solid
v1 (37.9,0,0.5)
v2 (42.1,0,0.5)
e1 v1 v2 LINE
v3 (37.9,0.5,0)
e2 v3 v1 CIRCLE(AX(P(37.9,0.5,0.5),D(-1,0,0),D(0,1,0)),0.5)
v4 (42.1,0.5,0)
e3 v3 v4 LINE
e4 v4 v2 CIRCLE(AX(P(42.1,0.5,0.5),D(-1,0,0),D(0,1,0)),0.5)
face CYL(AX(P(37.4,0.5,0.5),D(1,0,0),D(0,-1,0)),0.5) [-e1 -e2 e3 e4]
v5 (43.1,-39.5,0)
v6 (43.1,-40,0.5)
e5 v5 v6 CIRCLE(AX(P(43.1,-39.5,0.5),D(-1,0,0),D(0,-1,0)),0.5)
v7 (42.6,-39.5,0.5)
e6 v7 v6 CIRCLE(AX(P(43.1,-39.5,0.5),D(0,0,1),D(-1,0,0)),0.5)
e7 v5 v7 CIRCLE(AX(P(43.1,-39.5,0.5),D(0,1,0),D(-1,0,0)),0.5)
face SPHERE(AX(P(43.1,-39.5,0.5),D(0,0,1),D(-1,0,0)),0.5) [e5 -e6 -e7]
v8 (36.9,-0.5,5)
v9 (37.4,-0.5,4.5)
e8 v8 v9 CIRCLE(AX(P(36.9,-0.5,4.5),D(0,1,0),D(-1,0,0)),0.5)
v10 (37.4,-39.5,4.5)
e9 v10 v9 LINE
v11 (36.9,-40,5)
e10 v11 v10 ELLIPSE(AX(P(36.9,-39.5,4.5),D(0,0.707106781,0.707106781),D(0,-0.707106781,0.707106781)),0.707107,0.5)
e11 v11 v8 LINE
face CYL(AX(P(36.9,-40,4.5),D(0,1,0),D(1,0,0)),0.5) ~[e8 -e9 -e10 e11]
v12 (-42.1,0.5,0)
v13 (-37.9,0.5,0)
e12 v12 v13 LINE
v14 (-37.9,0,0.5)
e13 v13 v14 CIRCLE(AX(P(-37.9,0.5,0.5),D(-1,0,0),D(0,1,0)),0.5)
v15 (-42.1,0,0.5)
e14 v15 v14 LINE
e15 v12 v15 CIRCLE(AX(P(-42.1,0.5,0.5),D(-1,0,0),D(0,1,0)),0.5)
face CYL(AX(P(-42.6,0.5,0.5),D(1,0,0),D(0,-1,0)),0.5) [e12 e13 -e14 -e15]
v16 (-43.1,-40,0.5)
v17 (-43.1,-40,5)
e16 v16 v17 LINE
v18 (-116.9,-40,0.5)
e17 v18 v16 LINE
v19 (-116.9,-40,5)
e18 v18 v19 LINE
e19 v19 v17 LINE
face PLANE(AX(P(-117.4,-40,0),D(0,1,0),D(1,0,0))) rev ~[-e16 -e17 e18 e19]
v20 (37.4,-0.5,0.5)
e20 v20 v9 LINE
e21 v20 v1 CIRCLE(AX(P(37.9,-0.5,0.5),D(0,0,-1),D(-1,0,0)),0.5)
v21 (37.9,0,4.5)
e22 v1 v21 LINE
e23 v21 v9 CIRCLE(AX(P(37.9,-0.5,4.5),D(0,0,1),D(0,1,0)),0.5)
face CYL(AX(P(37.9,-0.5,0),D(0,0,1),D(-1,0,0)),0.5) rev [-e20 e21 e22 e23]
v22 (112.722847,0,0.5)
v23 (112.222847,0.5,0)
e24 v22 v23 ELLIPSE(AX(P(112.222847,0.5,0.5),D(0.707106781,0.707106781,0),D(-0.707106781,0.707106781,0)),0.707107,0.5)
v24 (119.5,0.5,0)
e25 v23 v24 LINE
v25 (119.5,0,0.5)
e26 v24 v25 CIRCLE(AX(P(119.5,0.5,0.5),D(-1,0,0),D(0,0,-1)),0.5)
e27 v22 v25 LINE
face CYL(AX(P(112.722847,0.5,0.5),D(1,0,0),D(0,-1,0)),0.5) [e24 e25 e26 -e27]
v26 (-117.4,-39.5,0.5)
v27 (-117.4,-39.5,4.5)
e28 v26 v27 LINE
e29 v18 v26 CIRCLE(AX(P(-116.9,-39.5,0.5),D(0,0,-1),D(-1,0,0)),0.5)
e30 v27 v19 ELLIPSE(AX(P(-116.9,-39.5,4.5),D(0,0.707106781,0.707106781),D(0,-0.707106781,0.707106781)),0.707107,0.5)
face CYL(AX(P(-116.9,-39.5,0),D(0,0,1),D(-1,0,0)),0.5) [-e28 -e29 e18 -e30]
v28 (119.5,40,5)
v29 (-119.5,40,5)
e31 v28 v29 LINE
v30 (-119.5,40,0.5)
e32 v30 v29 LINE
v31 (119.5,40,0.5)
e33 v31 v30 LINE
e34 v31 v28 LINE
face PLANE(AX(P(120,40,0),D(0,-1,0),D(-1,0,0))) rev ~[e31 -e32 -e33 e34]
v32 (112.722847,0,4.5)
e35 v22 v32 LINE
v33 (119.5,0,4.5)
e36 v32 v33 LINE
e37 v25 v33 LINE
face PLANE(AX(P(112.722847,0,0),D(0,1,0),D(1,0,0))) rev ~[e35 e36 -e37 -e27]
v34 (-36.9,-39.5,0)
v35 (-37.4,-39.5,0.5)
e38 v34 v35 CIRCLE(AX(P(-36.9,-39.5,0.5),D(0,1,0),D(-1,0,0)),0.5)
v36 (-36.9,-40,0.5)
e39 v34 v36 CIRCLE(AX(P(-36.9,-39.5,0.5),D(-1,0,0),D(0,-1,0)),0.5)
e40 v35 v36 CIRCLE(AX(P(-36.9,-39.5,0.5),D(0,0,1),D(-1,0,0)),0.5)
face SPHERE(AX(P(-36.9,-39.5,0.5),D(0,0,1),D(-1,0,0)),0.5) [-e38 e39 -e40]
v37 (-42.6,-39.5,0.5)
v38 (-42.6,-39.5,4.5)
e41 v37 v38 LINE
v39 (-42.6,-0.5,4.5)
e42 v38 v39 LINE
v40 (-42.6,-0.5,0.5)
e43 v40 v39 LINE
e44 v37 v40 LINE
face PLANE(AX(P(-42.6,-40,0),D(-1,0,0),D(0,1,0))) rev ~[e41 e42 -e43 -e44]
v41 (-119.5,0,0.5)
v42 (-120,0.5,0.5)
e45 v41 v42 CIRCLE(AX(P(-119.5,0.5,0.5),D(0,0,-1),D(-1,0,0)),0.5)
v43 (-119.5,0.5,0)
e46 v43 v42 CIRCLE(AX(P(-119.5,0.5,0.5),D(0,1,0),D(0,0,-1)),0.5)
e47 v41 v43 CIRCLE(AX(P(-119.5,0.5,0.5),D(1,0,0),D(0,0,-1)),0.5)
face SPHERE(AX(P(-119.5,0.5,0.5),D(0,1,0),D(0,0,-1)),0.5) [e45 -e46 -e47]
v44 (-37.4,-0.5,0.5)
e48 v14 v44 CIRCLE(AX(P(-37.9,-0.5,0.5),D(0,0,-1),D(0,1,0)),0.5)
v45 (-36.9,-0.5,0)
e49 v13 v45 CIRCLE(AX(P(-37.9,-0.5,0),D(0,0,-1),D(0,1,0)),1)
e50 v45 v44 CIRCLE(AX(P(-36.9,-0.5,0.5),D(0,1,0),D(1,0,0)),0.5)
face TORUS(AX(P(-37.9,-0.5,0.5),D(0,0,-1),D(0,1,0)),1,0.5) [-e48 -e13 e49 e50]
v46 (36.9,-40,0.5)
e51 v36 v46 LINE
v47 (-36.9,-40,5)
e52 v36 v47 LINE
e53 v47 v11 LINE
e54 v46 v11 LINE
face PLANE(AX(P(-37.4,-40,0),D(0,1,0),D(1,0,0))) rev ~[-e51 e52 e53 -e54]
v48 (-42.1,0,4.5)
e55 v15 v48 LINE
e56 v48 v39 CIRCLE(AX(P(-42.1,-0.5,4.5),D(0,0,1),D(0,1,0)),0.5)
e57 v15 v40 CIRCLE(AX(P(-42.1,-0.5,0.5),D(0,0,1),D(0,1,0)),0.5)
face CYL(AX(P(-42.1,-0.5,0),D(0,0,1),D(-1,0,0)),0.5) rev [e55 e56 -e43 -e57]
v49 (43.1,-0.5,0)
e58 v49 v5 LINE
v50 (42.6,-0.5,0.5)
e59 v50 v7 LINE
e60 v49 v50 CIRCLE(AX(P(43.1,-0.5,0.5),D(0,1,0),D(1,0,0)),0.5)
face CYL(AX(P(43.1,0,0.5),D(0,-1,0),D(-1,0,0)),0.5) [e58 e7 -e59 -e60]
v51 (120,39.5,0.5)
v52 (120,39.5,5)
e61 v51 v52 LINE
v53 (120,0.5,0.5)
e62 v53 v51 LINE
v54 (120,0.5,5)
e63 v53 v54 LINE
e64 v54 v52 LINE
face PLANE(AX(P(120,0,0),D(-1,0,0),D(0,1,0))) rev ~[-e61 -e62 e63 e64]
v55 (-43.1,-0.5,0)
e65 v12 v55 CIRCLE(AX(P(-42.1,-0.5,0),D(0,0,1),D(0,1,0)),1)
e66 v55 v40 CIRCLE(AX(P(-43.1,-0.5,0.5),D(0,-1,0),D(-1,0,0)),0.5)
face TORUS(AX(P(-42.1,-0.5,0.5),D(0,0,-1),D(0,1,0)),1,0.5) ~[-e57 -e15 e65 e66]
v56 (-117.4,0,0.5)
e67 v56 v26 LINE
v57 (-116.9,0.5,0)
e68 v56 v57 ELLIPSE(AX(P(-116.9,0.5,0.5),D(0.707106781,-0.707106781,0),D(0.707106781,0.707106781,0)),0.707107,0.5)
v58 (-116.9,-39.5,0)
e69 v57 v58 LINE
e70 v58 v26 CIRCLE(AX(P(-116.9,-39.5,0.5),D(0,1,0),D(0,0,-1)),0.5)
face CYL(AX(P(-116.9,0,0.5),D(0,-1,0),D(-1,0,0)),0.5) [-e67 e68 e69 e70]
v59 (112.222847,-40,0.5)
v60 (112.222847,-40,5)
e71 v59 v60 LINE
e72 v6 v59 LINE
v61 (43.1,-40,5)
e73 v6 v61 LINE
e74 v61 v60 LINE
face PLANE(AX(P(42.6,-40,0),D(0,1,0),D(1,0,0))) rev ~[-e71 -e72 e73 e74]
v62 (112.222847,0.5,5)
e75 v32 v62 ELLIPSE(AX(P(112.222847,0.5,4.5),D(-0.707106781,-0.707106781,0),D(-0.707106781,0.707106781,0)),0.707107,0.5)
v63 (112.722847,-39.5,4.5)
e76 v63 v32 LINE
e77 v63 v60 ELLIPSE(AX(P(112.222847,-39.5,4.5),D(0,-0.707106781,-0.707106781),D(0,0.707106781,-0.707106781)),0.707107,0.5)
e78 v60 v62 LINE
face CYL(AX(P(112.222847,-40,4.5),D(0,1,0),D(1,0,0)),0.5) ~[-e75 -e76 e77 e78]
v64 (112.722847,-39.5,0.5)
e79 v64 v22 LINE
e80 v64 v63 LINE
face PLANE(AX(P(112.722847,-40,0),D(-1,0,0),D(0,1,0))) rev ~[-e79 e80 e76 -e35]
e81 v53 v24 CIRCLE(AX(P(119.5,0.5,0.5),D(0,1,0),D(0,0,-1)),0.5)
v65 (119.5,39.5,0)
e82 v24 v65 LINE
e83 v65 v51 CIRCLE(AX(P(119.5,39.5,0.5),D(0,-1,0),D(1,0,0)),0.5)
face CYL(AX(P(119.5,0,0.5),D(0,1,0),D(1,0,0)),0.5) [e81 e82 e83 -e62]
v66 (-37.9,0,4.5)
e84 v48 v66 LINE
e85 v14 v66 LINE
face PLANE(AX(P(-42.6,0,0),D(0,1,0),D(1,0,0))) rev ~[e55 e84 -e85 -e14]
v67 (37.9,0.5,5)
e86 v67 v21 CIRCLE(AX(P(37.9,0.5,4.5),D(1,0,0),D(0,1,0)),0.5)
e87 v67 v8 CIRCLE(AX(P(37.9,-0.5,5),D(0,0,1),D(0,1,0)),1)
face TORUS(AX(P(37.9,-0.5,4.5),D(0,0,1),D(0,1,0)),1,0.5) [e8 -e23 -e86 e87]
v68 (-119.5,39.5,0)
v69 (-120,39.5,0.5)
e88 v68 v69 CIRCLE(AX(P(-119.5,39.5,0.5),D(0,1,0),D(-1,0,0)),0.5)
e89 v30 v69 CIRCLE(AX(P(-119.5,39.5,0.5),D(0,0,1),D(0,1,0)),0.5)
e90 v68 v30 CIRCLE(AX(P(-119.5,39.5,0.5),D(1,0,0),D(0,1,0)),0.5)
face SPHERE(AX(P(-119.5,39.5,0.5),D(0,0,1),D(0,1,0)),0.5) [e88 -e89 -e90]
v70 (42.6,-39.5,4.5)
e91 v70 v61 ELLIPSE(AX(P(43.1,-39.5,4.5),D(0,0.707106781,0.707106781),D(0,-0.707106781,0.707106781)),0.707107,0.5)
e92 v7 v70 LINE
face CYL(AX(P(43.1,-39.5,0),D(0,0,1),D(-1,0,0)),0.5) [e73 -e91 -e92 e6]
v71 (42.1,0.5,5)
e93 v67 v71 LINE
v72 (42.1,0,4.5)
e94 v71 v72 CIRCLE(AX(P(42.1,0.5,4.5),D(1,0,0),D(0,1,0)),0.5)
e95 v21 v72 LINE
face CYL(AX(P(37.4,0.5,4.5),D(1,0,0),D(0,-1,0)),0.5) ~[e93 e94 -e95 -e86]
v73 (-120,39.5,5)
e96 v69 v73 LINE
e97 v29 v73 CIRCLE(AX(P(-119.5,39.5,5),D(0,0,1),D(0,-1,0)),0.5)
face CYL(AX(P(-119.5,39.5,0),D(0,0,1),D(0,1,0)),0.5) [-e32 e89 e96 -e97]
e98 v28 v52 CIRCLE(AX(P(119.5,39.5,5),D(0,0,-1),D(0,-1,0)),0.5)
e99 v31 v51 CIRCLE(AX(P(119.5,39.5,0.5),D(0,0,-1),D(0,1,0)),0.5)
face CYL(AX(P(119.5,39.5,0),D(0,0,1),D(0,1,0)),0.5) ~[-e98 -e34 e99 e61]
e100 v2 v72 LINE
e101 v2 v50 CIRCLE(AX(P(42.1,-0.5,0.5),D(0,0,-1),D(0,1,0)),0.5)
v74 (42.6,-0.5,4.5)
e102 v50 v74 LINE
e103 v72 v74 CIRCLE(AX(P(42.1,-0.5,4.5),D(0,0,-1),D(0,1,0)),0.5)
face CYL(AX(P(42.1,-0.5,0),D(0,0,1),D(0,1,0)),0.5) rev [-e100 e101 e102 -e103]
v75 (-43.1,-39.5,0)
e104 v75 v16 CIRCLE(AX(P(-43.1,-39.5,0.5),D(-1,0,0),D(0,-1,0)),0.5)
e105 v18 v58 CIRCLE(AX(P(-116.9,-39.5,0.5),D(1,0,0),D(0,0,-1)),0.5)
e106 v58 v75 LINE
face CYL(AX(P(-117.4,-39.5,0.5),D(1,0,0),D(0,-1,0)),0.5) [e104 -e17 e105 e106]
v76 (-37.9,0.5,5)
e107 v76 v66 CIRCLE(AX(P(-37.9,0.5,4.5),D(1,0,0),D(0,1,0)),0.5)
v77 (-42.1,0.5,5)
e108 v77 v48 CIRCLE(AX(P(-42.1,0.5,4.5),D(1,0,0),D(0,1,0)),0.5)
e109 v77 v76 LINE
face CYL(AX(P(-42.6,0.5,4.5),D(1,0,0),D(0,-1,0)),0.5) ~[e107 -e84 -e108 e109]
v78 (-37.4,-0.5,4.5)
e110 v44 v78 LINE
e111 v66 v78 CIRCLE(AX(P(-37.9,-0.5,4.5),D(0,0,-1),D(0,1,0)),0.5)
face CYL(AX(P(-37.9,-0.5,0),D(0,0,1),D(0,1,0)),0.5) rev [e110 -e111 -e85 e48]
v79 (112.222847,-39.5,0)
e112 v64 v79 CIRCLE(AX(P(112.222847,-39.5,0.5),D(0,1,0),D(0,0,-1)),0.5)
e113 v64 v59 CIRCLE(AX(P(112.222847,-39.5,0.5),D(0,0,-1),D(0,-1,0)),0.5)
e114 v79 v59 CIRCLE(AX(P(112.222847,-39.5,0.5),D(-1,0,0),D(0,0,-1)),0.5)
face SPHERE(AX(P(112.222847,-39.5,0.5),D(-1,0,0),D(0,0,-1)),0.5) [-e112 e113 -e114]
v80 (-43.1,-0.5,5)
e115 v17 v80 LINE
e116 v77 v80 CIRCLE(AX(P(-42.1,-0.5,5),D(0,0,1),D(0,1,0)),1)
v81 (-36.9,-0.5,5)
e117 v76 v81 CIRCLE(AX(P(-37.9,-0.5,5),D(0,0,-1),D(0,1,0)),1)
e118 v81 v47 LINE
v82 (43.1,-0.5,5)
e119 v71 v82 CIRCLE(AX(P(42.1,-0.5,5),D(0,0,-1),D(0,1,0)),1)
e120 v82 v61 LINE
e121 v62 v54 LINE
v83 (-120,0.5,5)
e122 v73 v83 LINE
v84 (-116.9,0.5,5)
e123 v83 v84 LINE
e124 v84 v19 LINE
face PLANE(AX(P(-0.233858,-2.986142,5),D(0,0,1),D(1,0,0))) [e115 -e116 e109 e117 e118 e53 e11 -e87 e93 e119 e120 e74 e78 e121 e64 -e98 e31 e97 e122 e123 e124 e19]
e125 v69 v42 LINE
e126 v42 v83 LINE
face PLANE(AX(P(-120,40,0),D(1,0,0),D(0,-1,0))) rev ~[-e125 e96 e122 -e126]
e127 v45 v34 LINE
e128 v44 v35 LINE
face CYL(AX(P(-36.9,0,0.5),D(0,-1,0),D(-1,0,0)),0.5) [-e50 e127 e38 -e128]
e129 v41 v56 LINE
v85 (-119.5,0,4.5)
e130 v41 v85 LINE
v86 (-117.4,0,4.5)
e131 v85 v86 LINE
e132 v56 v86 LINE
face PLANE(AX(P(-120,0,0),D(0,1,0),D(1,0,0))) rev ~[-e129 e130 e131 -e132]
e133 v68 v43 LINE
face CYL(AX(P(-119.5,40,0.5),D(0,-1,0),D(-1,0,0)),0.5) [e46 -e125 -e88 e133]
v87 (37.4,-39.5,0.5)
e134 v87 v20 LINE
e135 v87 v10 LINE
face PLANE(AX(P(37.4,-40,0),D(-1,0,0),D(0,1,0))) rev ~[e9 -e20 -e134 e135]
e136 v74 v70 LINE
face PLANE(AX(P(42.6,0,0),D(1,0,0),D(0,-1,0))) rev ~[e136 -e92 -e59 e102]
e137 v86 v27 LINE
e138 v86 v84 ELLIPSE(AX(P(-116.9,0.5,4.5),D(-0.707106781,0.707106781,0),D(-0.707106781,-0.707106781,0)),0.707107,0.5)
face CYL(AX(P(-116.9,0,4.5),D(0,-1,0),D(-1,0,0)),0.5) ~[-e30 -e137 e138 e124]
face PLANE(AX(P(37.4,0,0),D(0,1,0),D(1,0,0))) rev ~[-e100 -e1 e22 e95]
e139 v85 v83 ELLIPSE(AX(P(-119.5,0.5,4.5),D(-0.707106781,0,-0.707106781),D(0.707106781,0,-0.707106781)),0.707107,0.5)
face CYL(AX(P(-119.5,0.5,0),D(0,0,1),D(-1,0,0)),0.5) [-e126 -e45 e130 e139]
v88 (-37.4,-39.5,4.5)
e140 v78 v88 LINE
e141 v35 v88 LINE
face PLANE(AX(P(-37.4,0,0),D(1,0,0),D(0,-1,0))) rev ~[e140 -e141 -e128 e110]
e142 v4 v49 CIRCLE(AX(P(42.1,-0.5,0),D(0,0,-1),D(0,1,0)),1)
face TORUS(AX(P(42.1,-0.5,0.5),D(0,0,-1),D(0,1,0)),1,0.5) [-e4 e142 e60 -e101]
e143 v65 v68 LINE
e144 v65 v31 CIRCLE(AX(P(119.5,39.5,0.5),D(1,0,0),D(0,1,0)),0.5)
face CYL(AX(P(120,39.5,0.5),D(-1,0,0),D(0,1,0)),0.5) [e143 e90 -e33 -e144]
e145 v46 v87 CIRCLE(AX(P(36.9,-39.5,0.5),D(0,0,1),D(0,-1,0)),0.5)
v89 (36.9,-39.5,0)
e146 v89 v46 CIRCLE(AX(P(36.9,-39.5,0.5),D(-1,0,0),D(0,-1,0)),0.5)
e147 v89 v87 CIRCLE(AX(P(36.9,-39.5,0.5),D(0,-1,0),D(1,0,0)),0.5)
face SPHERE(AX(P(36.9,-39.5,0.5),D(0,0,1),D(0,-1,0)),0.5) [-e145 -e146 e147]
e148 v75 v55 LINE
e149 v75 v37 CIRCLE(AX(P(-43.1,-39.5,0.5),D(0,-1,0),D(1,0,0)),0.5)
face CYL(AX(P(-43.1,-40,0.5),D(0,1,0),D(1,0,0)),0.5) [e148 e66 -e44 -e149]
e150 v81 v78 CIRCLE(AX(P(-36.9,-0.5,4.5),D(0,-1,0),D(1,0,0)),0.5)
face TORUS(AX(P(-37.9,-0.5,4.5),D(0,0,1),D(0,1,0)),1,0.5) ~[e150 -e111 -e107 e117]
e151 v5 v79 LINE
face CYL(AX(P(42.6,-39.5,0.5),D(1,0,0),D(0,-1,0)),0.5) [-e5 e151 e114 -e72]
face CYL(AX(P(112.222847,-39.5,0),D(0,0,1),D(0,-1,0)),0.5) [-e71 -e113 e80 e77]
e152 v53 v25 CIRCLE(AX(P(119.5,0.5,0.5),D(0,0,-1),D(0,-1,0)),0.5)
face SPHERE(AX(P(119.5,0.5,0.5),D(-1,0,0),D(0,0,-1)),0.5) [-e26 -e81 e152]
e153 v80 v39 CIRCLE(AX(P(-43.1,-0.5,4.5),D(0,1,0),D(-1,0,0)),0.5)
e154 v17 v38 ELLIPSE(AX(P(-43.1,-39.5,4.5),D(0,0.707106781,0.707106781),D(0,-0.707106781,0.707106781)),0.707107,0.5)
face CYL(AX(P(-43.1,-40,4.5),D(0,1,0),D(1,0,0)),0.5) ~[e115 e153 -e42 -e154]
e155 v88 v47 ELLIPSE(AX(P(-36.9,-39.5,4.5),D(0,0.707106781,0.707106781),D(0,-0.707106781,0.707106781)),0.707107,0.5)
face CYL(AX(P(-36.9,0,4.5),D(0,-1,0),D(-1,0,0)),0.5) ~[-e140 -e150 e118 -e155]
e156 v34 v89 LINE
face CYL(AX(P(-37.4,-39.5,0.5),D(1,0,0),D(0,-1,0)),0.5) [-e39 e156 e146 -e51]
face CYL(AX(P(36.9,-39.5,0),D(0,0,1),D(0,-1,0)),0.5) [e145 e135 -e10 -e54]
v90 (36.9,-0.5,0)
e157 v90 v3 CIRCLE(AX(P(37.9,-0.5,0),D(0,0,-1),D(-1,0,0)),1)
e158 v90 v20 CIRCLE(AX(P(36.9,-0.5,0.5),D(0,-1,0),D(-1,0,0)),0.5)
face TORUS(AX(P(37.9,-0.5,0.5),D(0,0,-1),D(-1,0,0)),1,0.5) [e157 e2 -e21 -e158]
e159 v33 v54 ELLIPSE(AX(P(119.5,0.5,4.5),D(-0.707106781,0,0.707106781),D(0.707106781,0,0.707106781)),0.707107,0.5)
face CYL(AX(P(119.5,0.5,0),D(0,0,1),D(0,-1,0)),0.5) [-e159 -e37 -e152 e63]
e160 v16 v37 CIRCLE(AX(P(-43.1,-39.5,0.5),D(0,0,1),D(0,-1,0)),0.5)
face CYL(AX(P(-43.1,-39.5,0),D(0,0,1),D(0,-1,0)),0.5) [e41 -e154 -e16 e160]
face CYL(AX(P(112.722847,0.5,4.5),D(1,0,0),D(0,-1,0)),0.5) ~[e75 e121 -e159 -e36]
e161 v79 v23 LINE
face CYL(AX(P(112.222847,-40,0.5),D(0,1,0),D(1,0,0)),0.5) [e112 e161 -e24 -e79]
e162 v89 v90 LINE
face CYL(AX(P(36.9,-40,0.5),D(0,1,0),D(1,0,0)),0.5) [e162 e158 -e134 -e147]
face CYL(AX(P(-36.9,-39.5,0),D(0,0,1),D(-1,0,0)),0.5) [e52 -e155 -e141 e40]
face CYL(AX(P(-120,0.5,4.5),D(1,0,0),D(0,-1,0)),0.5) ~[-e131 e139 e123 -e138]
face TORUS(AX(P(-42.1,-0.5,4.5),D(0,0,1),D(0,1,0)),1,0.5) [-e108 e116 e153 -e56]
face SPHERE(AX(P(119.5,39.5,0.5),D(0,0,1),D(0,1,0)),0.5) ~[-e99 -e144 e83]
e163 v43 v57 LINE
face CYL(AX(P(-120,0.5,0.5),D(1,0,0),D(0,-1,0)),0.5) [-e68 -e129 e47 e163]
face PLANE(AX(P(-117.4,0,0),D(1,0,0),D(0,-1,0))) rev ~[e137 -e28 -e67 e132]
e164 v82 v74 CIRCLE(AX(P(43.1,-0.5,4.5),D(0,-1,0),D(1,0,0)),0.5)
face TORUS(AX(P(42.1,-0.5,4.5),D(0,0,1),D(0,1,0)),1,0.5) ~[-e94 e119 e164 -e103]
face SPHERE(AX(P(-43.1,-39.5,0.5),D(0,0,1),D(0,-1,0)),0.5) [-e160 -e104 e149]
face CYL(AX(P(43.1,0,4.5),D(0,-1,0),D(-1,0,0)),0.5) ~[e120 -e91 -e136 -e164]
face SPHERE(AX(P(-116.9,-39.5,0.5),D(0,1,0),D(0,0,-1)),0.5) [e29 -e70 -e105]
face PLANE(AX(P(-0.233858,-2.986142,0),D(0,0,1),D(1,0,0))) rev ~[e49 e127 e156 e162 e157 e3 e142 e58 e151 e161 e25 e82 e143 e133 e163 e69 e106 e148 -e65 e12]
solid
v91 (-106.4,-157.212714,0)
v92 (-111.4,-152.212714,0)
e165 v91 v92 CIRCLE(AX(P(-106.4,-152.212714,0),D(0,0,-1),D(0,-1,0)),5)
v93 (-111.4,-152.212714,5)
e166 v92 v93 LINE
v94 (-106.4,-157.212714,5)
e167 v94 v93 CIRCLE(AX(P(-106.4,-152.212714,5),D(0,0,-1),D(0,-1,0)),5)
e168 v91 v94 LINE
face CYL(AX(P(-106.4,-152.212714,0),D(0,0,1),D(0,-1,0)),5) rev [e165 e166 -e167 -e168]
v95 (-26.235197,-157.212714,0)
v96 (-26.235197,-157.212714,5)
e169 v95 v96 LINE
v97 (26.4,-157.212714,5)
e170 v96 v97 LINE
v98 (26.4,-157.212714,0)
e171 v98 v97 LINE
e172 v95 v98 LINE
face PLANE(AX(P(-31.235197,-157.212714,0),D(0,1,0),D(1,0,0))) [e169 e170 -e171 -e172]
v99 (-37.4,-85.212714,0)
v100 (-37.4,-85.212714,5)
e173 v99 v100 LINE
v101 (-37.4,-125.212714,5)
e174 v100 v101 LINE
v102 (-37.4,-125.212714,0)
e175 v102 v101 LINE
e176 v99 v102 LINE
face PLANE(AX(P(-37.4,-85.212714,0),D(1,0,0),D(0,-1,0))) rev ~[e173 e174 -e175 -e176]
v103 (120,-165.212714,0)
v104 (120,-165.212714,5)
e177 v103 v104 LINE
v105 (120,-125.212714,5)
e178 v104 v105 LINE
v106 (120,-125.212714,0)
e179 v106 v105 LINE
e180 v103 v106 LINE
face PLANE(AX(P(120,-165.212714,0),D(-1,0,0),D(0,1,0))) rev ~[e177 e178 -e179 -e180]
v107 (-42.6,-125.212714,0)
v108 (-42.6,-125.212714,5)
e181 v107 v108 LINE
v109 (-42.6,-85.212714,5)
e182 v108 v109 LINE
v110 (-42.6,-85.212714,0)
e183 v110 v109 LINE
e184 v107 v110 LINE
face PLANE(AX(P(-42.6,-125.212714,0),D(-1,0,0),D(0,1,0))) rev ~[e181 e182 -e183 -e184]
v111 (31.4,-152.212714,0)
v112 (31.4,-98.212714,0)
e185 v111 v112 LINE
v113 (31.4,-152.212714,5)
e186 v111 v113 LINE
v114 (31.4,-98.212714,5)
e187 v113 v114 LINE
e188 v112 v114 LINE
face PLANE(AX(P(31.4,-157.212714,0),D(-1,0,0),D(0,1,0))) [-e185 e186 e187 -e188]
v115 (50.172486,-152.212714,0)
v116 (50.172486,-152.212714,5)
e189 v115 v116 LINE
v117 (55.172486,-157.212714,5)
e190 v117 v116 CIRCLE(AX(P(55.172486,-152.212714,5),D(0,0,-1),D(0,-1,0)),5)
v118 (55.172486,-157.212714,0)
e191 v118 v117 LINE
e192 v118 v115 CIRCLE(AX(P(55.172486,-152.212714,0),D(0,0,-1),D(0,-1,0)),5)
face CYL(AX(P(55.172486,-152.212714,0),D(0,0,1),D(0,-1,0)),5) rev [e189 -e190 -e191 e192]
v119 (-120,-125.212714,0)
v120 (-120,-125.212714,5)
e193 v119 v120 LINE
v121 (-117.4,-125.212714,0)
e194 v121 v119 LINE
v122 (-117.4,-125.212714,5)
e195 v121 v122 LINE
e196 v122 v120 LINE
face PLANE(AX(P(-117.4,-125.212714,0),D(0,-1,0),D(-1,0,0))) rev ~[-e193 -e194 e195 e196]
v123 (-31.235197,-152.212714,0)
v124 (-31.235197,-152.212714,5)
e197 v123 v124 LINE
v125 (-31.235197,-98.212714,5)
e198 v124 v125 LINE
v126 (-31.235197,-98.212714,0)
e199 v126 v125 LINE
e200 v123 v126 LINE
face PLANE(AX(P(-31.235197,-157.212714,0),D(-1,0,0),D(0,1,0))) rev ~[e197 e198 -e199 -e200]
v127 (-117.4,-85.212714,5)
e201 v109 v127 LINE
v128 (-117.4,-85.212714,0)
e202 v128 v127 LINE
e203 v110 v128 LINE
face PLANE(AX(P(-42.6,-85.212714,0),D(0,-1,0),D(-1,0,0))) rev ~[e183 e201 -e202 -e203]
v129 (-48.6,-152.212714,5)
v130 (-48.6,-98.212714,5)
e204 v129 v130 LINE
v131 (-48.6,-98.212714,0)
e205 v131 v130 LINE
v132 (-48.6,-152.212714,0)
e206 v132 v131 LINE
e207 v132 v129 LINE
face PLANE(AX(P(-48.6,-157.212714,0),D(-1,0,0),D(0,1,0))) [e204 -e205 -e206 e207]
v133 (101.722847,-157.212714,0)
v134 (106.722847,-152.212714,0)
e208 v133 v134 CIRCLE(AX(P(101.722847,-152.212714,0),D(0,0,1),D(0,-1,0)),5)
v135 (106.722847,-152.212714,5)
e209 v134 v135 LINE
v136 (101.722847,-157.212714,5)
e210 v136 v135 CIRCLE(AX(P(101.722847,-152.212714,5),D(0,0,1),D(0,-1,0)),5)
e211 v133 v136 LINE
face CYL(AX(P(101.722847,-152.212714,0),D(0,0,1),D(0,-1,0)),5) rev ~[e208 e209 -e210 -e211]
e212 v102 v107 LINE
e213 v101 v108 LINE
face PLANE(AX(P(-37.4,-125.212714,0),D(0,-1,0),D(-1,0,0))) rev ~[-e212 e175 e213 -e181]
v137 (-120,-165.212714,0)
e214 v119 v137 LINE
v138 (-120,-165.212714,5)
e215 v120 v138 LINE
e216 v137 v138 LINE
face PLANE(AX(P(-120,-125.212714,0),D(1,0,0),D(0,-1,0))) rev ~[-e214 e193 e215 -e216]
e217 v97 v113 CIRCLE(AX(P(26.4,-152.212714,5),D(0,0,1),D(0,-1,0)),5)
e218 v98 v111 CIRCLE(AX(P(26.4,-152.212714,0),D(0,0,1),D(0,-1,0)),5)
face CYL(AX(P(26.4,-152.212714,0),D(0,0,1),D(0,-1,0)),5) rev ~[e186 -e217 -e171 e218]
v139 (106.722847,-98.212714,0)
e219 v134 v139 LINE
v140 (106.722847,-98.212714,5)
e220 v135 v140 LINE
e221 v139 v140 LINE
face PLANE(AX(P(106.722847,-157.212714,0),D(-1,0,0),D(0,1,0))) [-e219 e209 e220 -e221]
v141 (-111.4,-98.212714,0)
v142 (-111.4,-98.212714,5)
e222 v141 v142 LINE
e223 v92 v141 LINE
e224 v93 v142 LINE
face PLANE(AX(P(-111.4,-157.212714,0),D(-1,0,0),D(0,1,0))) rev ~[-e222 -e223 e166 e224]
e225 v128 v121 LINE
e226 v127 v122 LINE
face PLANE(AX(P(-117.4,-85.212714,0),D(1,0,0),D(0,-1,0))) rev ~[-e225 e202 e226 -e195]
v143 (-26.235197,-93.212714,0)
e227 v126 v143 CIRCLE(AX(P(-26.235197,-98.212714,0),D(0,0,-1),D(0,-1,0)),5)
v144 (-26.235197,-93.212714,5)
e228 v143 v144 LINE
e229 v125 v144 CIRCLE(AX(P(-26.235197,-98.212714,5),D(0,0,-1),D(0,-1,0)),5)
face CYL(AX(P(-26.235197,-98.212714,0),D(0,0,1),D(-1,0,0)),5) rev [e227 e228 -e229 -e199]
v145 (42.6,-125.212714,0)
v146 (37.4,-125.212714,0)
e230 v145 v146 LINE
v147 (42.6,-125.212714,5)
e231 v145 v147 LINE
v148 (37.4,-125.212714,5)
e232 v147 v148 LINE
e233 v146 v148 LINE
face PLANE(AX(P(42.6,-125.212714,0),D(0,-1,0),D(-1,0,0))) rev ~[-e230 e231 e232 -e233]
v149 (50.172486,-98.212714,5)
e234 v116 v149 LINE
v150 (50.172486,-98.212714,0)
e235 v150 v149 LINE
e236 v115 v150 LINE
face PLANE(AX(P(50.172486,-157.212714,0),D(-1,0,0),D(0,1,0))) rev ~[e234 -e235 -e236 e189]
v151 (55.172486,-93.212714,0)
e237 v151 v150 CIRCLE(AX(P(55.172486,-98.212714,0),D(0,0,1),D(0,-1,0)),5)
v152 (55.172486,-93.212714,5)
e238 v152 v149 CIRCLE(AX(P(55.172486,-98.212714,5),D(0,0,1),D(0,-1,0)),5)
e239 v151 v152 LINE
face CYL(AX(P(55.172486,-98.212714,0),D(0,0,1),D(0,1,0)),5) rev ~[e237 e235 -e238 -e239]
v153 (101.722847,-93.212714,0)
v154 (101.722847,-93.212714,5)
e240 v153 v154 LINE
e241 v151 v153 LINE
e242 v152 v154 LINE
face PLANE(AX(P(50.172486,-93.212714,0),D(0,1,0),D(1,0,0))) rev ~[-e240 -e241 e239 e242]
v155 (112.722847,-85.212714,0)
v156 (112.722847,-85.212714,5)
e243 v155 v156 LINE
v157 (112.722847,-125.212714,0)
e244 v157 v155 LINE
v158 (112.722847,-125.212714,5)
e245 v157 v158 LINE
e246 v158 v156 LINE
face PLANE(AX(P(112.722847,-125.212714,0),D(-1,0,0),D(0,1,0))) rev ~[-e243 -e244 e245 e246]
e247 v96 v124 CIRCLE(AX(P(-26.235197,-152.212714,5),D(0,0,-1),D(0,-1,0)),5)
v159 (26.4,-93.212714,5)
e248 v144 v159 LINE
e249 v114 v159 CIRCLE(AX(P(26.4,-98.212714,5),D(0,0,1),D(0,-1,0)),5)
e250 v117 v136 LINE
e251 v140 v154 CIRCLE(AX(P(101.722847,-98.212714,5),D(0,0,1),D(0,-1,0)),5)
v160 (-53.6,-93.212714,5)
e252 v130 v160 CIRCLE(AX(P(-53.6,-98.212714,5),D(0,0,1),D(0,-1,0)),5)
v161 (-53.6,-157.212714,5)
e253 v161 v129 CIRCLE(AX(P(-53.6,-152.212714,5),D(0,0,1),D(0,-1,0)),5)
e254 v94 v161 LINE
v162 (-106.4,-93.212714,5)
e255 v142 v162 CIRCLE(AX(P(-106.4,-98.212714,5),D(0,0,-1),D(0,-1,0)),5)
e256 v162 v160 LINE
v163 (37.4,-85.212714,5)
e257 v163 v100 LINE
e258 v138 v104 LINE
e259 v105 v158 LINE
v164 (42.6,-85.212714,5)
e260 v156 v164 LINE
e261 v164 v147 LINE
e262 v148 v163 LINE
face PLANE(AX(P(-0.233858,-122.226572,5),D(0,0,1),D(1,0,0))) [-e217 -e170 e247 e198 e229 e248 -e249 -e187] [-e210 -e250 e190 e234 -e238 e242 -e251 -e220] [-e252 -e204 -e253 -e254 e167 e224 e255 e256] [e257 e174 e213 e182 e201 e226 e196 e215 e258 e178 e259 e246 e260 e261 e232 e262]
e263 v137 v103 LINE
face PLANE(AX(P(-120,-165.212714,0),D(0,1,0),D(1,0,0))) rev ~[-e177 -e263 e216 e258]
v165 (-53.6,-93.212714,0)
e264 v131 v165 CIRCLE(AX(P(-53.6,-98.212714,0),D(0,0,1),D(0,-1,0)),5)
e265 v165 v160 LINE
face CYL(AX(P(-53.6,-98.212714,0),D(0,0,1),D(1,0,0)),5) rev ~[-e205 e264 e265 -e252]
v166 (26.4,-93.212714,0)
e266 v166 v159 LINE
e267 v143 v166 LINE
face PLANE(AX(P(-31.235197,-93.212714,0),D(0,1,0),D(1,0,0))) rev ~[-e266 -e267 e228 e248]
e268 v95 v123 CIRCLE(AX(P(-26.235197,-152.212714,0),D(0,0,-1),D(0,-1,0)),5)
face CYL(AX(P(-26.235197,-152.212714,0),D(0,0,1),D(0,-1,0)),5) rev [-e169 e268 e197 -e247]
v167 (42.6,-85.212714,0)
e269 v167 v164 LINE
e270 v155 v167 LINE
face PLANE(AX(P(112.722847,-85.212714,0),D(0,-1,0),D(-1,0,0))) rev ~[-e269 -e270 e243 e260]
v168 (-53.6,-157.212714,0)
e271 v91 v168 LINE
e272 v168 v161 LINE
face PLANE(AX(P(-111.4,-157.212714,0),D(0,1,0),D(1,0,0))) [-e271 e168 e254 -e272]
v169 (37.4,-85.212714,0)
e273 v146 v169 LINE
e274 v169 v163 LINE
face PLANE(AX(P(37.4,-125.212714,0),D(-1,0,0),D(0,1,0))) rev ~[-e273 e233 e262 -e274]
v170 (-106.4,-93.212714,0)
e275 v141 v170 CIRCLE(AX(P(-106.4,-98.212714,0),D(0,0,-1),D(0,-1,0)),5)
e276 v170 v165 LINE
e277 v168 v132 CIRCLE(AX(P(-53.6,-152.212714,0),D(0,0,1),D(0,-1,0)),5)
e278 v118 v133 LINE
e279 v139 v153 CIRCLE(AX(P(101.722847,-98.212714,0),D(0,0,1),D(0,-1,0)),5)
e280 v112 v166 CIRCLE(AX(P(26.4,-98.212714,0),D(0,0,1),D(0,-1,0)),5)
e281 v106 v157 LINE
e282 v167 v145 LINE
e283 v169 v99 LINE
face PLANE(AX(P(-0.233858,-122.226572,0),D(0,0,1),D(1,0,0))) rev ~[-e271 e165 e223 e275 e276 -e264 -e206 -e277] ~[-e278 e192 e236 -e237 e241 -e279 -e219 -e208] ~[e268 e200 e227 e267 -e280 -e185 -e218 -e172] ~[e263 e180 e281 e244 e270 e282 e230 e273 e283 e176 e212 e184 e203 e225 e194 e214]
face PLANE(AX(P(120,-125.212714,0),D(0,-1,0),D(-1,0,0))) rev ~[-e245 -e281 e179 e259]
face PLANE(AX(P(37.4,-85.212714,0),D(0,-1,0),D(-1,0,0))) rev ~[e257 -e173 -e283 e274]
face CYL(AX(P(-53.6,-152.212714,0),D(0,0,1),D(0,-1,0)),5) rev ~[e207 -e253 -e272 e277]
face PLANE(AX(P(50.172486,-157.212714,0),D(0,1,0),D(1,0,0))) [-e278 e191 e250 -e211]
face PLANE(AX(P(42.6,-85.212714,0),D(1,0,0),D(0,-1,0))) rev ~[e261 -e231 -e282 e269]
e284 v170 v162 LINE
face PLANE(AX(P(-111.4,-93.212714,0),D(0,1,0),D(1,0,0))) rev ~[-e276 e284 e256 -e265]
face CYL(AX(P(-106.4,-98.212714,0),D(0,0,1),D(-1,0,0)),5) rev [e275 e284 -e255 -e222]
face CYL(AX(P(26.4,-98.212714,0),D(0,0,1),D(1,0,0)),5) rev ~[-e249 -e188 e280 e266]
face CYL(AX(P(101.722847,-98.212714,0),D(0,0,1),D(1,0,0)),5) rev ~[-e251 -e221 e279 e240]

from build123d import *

# Parameters (mm, degrees)
F1_DEPTH = 5
F0_W     = 62.8
F0_H     = 64
F0_W_2   = 62.635196808
F0_W_3   = 56.5503612161
F2_R     = 0.5
F3_R     = 5


with BuildPart() as f1:
    # F0 (on Top) → F1 (new body)
    with BuildSketch(Plane.XY):
        Polygon((120, 40), (-120, 40), (-120, 0), (-117.4, 0), (-117.4, -40), (-42.6, -40), (-42.6, 0), (-37.4, 0), (-37.4, -40), (37.4, -40), (37.4, 0), (42.6, 0), (42.6, -40), (112.7228473783, -40), (112.7228473783, 0), (120, 0), align=None)
    extrude(amount=F1_DEPTH)

    # F2
    f2_edges = [f1.edges().sort_by_distance(p)[0] for p in [
        (-42.6, -40, 2.5),
        (-37.4, -40, 2.5),
        (37.4, -40, 2.5),
        (42.6, -40, 2.5),
        (-120, 40, 2.5),
        (120, 40, 2.5),
        (42.6, 0, 2.5),
        (37.4, 0, 2.5),
        (-37.4, 0, 2.5),
        (-42.6, 0, 2.5),
        (-40, 0, 0),
        (0, 40, 0),
        (-120, 20, 0),
        (-118.7, 0, 0),
        (-117.4, -20, 0),
        (-80, -40, 0),
        (-42.6, -20, 0),
        (-37.4, -20, 0),
        (0, -40, 0),
        (37.4, -20, 0),
        (40, 0, 0),
        (42.6, -20, 0),
        (77.661424, -40, 0),
        (112.722847, -20, 0),
        (116.361424, 0, 0),
        (120, 20, 0),
        (-40, 0, 5),
        (40, 0, 5),
        (-117.4, -20, 5),
        (-118.7, 0, 5),
        (112.722847, -20, 5),
        (116.361424, 0, 5),
        (-120, 0, 2.5),
        (-117.4, -40, 2.5),
        (-42.6, -20, 5),
        (-37.4, -20, 5),
        (37.4, -20, 5),
        (42.6, -20, 5),
        (112.722847, -40, 2.5),
        (120, 0, 2.5),
    ]]
    fillet(f2_edges, radius=F2_R)


with BuildPart() as f1b:
    # F0 (on Top) → F1, piece 2 (new body)
    with BuildSketch(Plane.XY):
        Polygon((-42.6, -85.212714076), (-117.4, -85.212714076), (-117.4, -125.212714076), (-120, -125.212714076), (-120, -165.212714076), (120, -165.212714076), (120, -125.212714076), (112.7228473783, -125.212714076), (112.7228473783, -85.212714076), (42.6, -85.212714076), (42.6, -125.212714076), (37.4, -125.212714076), (37.4, -85.212714076), (-37.4, -85.212714076), (-37.4, -125.212714076), (-42.6, -125.212714076), align=None)
        with Locations((-80, -125.212714076)):
            Rectangle(F0_W, F0_H, mode=Mode.SUBTRACT)
        with Locations((0.082401596, -125.212714076)):
            Rectangle(F0_W_2, F0_H, mode=Mode.SUBTRACT)
        with Locations((78.4476667702, -125.212714076)):
            Rectangle(F0_W_3, F0_H, mode=Mode.SUBTRACT)
    extrude(amount=F1_DEPTH)

    # F3
    f3_edges = [f1b.edges().sort_by_distance(p)[0] for p in [
        (-111.4, -93.212714, 2.5),
        (-48.6, -93.212714, 2.5),
        (-111.4, -157.212714, 2.5),
        (-48.6, -157.212714, 2.5),
        (106.722847, -93.212714, 2.5),
        (31.4, -93.212714, 2.5),
        (31.4, -157.212714, 2.5),
        (106.722847, -157.212714, 2.5),
        (50.172486, -157.212714, 2.5),
        (-31.235197, -157.212714, 2.5),
        (-31.235197, -93.212714, 2.5),
        (50.172486, -93.212714, 2.5),
    ]]
    fillet(f3_edges, radius=F3_R)


solid = Compound([f1.part, f1b.part])
